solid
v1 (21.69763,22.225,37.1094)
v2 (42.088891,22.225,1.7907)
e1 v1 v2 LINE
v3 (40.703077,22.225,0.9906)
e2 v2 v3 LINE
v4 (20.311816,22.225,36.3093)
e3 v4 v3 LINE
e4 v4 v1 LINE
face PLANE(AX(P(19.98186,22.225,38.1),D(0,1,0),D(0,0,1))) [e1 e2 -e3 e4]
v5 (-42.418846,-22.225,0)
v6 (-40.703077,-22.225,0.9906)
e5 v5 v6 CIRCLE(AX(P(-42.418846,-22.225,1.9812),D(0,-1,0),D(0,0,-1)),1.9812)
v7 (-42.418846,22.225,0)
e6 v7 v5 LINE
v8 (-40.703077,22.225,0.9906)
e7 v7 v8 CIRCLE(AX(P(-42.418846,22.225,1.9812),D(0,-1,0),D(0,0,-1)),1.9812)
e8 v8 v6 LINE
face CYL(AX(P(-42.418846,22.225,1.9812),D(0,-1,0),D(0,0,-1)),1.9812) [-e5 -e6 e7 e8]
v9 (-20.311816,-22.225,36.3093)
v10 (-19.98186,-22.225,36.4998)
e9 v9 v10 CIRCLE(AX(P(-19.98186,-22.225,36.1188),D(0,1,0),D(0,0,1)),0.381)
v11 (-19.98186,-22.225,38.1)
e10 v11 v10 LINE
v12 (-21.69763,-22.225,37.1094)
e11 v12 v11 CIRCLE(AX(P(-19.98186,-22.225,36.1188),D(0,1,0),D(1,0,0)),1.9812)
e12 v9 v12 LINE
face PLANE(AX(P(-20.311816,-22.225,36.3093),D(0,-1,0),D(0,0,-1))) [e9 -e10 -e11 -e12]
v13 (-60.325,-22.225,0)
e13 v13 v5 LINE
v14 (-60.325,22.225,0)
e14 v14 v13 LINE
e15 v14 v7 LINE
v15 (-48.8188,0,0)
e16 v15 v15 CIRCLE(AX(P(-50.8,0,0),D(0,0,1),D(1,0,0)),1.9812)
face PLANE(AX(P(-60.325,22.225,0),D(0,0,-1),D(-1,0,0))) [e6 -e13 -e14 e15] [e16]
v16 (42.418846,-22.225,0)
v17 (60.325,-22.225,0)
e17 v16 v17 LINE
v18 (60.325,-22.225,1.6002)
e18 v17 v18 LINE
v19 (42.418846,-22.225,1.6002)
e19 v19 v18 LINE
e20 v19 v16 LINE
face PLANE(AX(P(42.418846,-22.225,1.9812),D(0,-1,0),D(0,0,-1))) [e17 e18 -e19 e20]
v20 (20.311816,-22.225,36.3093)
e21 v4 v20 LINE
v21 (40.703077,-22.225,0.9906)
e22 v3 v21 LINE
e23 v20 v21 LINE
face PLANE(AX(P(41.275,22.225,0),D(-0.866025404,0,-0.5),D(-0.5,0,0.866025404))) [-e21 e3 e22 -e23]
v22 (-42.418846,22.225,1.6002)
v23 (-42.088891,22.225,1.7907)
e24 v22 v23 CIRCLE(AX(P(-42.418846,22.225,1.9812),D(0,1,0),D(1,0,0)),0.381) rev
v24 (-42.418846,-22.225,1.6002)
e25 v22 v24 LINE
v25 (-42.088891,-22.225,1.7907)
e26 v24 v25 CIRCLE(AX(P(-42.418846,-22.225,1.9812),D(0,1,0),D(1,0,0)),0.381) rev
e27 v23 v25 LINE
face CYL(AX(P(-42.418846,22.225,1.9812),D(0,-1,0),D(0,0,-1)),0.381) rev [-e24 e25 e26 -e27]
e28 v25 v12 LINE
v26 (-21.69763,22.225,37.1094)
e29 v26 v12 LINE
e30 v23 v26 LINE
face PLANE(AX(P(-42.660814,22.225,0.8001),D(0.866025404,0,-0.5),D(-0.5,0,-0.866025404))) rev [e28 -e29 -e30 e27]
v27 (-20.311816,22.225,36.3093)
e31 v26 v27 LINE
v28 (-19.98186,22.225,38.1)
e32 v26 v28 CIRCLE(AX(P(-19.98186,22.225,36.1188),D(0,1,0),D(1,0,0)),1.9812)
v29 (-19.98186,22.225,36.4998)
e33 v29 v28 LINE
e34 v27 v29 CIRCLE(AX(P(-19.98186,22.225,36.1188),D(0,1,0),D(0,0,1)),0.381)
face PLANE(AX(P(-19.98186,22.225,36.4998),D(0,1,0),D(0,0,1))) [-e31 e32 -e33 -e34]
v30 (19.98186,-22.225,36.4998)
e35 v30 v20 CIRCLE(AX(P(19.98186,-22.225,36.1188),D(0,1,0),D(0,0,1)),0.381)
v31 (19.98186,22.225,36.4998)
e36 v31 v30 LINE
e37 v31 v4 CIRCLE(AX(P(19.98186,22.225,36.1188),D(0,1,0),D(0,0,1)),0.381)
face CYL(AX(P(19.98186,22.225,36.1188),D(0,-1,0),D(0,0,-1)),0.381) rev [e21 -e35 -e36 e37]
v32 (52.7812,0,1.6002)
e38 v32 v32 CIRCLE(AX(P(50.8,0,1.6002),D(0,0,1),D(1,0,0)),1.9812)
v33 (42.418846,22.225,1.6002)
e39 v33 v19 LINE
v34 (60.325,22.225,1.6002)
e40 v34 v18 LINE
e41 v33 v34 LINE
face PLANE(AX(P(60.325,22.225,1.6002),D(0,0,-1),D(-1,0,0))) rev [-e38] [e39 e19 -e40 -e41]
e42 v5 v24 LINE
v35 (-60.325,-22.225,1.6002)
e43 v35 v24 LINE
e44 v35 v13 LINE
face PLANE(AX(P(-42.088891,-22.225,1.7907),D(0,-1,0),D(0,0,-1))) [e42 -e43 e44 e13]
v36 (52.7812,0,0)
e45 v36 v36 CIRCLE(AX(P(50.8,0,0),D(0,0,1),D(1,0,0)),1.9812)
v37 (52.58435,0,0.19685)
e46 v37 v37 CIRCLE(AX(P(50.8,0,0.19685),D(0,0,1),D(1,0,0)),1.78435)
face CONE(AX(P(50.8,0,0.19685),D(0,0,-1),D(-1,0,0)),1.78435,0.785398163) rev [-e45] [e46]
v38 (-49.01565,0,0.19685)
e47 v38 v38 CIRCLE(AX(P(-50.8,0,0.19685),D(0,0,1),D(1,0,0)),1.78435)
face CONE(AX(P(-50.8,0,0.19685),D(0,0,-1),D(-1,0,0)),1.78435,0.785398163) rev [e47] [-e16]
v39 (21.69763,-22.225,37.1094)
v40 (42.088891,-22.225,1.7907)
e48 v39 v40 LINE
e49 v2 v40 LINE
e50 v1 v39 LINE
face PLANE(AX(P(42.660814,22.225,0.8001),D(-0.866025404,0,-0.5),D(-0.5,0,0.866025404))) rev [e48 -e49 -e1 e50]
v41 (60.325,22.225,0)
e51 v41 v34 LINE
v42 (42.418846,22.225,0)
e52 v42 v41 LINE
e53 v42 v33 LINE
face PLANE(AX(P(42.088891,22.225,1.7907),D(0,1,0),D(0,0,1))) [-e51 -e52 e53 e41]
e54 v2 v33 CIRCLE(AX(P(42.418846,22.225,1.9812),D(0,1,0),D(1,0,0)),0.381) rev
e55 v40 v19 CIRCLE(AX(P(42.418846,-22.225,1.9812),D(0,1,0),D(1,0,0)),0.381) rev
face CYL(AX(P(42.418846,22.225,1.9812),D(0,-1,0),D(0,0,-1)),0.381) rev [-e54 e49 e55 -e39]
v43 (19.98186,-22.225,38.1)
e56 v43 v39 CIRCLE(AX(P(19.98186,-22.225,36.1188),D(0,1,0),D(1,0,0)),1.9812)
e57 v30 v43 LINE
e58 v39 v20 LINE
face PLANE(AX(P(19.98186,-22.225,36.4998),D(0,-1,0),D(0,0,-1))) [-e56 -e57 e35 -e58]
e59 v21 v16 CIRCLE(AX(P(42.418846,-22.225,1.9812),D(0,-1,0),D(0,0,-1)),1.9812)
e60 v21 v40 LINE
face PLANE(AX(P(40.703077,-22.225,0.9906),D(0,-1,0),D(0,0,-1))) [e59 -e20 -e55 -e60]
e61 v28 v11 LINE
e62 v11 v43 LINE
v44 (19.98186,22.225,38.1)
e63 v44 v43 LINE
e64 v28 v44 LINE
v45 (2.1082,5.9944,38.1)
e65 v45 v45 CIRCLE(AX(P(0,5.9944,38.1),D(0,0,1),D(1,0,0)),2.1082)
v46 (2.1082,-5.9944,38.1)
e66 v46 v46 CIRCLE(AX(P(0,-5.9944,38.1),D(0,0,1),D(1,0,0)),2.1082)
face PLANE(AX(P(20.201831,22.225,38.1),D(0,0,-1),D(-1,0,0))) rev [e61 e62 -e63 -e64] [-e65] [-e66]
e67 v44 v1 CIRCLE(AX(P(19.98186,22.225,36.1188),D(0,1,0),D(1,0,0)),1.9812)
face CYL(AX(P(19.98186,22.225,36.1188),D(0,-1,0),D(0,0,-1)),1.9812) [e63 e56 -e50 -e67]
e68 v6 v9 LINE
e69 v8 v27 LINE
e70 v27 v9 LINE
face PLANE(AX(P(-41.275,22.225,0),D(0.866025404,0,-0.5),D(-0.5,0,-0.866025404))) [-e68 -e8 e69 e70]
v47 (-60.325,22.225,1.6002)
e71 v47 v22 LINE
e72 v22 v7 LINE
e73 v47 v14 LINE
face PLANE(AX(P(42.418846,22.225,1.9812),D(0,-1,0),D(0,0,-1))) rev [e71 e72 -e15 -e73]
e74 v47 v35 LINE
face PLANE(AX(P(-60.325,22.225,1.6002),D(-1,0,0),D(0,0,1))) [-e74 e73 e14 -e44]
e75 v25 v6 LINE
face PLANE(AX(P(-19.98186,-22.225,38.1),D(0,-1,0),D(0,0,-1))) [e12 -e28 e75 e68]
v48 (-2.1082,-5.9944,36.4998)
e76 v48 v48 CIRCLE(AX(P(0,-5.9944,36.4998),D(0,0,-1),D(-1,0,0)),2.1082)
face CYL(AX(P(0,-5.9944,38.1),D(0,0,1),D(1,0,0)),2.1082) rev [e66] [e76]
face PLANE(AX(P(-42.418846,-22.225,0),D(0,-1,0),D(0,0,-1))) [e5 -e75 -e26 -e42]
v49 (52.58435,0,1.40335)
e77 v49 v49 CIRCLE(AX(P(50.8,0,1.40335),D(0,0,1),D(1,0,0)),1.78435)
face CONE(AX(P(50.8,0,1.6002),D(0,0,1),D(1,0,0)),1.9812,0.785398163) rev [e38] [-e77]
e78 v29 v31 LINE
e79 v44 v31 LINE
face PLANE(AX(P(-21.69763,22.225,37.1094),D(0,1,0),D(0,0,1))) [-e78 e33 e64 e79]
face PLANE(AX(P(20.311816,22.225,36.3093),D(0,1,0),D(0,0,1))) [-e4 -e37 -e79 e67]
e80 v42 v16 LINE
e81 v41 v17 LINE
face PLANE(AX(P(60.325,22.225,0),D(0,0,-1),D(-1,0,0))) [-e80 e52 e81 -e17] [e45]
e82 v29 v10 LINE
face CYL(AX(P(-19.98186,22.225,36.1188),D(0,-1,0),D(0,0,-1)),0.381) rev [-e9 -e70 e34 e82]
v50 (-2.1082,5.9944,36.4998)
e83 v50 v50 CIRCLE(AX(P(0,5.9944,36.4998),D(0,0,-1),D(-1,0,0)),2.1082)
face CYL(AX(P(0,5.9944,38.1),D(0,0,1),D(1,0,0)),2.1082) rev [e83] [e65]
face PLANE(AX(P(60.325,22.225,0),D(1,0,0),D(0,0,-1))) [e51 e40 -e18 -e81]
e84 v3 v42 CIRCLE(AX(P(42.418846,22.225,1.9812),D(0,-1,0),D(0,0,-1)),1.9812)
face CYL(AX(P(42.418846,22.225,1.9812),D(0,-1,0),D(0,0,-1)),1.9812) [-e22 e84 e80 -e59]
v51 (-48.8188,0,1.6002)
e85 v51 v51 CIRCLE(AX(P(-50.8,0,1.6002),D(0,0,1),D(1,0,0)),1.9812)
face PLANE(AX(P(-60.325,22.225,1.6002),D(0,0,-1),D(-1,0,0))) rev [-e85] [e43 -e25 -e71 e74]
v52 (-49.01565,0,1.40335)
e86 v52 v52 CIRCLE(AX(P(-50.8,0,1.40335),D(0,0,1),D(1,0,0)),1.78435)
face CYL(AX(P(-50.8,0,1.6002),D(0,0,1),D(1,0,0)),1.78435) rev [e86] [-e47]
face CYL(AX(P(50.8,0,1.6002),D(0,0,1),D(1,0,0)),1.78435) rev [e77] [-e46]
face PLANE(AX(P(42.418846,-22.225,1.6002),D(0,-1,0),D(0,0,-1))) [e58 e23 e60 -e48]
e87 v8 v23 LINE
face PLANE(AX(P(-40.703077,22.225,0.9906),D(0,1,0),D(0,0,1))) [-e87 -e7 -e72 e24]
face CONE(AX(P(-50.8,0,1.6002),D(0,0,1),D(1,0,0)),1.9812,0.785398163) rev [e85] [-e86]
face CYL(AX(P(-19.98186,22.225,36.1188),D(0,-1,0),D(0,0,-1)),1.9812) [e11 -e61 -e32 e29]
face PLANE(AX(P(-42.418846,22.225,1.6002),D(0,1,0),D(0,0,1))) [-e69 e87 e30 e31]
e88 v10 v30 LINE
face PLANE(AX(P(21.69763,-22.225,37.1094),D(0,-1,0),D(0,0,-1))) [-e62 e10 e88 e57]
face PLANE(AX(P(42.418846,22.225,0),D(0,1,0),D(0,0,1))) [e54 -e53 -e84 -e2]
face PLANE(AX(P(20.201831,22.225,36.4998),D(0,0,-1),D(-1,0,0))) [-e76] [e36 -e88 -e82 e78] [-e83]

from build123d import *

# Parameters (mm, degrees)
BASE_FLANGE1_DEPTH                    = 22.225
F_28_0_1405_DIAMETER_HOLE1_AT_2_COUNT = 2
F_28_0_1405_DIAMETER_HOLE1_AT_2_PITCH = 101.6
F_19_0_166_DIAMETER_HOLE1_D           = 4.2164


# Sheet-metal steps are written as plain solids
with BuildPart() as part:
    # Sketch2 → Base-Flange1 (new, symmetric)
    with BuildSketch(Plane(origin=(0, 0, 0), x_dir=(1, 0, 0), z_dir=(0, 1, 0))):
        with BuildLine():
            Line((60.325, 0), (42.418846353, 0))
            ThreePointArc((42.418846353, 0), (41.428246353, -0.26543047), (40.703076823, -0.9906))
            Line((40.703076823, -0.9906), (20.311815871, -36.3093))
            ThreePointArc((20.311815871, -36.3093), (20.172360192, -36.448755679), (19.981860192, -36.4998))
            Line((19.981860192, -36.4998), (-19.981860192, -36.4998))
            ThreePointArc((-19.981860192, -36.4998), (-20.172360192, -36.448755679), (-20.311815871, -36.3093))
            Line((-20.311815871, -36.3093), (-40.703076823, -0.9906))
            ThreePointArc((-40.703076823, -0.9906), (-41.428246353, -0.26543047), (-42.418846353, 0))
            Line((-42.418846353, 0), (-60.325, 0))
            Line((-60.325, 0), (-60.325, -1.6002))
            Line((-60.325, -1.6002), (-42.418846353, -1.6002))
            ThreePointArc((-42.418846353, -1.6002), (-42.228346353, -1.651244321), (-42.088890674, -1.7907))
            Line((-42.088890674, -1.7907), (-21.697629722, -37.1094))
            ThreePointArc((-21.697629722, -37.1094), (-20.972460192, -37.83456953), (-19.981860192, -38.1))
            Line((-19.981860192, -38.1), (19.981860192, -38.1))
            ThreePointArc((19.981860192, -38.1), (20.972460192, -37.83456953), (21.697629722, -37.1094))
            Line((21.697629722, -37.1094), (42.088890674, -1.7907))
            ThreePointArc((42.088890674, -1.7907), (42.228346353, -1.651244321), (42.418846353, -1.6002))
            Line((42.418846353, -1.6002), (60.325, -1.6002))
            Line((60.325, -1.6002), (60.325, 0))
        make_face()
    extrude(amount=BASE_FLANGE1_DEPTH, both=True)

    # Sketch4 → #28 (0.1405) Diameter Hole1 (revolve, cut)
    with BuildSketch(Plane(origin=(50.8, 0, 1.6002), x_dir=(0, -1, 0), z_dir=(1, 0, 0))):
        Polygon((0, 0), (0, 1.6002), (1.9812, 1.6002), (1.78435, 1.40335), (1.78435, 0.19685), (1.9812, 0), align=None)
    f_28_0_1405_diameter_hole1 = revolve(axis=Axis((50.8, 0, 7.9502), (0, 0, -1)), mode=Mode.SUBTRACT)

    # #28 (0.1405) Diameter Hole1 at 2: #28 (0.1405) Diameter Hole1 ×2
    with Locations(*[(-i * F_28_0_1405_DIAMETER_HOLE1_AT_2_PITCH, 0, 0) for i in range(1, F_28_0_1405_DIAMETER_HOLE1_AT_2_COUNT)]):
        add(f_28_0_1405_diameter_hole1, mode=Mode.SUBTRACT)

    # #19 (0.166) Diameter Hole1 (through all)
    with Locations(Plane.XY.offset(38.1)):
        with Locations((0, 5.9944), (0, -5.9944)):
            Hole(F_19_0_166_DIAMETER_HOLE1_D / 2)


solid = part.part
